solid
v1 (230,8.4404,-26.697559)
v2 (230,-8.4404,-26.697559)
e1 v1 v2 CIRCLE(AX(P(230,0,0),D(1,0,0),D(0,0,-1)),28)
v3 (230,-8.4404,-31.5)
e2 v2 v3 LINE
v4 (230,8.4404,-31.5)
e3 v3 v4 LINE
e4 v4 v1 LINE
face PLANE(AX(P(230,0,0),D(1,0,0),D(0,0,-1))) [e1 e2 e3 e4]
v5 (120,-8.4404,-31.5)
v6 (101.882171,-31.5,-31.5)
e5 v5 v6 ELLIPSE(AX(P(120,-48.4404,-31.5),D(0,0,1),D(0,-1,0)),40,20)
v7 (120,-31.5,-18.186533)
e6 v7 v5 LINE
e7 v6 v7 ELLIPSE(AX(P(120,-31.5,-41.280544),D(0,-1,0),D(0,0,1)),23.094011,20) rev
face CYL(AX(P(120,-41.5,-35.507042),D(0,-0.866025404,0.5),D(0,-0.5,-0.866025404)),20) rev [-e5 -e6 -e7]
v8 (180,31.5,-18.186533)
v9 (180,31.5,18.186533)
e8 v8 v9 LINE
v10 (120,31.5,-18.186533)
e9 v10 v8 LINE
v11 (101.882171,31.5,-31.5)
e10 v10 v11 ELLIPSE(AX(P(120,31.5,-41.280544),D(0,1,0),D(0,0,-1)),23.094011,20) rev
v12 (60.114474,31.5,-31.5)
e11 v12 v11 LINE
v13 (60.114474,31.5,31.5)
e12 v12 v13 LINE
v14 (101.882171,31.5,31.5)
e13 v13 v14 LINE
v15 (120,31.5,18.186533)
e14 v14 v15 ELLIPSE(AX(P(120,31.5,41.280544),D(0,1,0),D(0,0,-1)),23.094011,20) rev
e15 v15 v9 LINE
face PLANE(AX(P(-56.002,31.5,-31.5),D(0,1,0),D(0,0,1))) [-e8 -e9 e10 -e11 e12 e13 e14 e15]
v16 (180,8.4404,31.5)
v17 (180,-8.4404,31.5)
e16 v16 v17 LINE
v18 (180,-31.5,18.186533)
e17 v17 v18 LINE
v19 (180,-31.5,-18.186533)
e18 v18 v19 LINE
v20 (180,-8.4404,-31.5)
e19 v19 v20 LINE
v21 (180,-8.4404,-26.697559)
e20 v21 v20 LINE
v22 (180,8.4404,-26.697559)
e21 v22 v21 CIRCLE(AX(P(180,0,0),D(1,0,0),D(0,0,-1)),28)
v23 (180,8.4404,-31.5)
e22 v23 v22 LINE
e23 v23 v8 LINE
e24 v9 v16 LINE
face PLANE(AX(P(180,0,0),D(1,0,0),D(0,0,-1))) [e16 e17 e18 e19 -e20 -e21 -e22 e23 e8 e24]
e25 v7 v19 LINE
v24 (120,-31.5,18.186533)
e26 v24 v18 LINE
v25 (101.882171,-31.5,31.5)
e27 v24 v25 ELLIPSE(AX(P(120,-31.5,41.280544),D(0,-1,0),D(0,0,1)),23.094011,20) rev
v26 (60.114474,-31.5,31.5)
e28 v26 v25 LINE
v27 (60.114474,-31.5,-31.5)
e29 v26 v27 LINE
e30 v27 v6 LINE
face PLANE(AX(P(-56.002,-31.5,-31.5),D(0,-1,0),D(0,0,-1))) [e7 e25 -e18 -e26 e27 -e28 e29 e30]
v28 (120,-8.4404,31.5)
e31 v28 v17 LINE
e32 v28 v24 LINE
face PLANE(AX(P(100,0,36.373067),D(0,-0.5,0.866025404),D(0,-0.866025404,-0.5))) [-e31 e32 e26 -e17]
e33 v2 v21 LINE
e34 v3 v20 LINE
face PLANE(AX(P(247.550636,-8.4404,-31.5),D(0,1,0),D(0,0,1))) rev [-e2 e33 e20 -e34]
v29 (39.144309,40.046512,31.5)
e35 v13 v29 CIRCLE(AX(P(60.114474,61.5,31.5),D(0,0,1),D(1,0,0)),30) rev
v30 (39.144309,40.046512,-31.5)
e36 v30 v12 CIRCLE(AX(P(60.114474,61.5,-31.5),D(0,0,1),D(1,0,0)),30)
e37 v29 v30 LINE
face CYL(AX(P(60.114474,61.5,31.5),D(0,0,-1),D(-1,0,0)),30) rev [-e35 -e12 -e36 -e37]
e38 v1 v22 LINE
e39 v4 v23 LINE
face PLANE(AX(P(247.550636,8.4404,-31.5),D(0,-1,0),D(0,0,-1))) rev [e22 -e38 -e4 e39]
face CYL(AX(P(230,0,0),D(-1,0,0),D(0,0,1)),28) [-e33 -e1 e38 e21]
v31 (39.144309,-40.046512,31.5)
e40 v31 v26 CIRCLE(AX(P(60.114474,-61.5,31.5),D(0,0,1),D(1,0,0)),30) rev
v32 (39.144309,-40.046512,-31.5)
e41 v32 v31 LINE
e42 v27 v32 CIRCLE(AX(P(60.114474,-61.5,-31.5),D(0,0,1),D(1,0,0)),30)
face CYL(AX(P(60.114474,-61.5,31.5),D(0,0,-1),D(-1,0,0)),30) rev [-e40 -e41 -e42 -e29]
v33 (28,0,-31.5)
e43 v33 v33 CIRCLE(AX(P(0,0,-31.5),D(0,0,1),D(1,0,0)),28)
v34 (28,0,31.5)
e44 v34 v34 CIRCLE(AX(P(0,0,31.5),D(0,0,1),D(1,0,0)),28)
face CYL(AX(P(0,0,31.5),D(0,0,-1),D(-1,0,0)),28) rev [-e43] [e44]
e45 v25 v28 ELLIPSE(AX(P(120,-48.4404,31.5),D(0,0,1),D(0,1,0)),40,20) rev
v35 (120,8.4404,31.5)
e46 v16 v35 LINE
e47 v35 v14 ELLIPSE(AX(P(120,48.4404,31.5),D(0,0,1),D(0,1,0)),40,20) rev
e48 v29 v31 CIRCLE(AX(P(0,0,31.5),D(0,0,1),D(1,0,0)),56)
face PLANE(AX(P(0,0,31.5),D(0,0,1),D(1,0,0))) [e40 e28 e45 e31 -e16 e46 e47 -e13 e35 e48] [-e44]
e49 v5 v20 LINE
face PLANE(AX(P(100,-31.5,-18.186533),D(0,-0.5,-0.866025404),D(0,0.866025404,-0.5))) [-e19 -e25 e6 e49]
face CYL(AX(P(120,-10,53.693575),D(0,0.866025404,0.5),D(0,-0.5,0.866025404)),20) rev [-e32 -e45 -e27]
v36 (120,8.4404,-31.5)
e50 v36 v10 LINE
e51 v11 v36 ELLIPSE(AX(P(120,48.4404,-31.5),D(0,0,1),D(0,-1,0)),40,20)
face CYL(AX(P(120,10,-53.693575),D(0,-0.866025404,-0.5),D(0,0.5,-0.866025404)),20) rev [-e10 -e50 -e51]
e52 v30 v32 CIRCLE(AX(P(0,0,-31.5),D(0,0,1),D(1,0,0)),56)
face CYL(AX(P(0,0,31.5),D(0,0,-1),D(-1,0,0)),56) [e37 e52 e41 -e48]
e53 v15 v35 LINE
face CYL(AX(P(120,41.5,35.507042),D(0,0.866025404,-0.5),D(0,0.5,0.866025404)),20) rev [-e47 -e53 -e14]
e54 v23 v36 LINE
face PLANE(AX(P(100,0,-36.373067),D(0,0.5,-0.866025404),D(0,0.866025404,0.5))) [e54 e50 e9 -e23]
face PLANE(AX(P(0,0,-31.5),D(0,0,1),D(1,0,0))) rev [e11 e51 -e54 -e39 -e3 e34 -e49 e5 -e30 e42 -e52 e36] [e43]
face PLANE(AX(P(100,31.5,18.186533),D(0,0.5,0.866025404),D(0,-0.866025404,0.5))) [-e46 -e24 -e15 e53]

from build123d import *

# Parameters (mm, degrees)
SKETCH1_R                = 56
SKETCH1_R_2              = 28
BOSS_EXTRUDE1_DEPTH      = 31.5
BOSS_EXTRUDE2_REACH      = 246.59
BOSS_EXTRUDE2_END_RADIUS = 56
SKETCH2_W                = 63
SKETCH2_H                = 63
FILLET1_R                = 30
SKETCH3_R                = 28
BOSS_EXTRUDE3_DEPTH      = 50
SKETCH4_R                = 53.440477433
CUT_EXTRUDE1_DEPTH       = 80
FILLET2_R                = 20
BOSS_EXTRUDE4_DEPTH      = 50


with BuildPart() as part:
    # Sketch1 → Boss-Extrude1 (new, symmetric)
    with BuildSketch(Plane.XY):
        Circle(SKETCH1_R)
        Circle(SKETCH1_R_2, mode=Mode.SUBTRACT)
    extrude(amount=BOSS_EXTRUDE1_DEPTH, both=True)

    # Boss-Extrude2: up to this cylinder (the profile starts outside it)
    boss_extrude2_end = Plane(origin=(0, 0, 0), z_dir=(0, 0, -1)) * Cylinder(BOSS_EXTRUDE2_END_RADIUS, 606.18, mode=Mode.PRIVATE)
    # Sketch2 → Boss-Extrude2 (add, up to the surface)
    with BuildSketch(Plane(origin=(180, 0, 0), x_dir=(0, 0, -1), z_dir=(1, 0, 0)), mode=Mode.PRIVATE) as boss_extrude2_sk1:
        Rectangle(SKETCH2_W, SKETCH2_H)
    boss_extrude2_tool1 = extrude(boss_extrude2_sk1.sketch, amount=-BOSS_EXTRUDE2_REACH, mode=Mode.PRIVATE) - boss_extrude2_end
    add(boss_extrude2_tool1.solids().sort_by_distance((180, 0, 0))[0])

    # Fillet1
    fillet1_edges = [part.edges().sort_by_distance(p)[0] for p in [
        (46.300647944, -31.5, 0),
        (46.300647944, 31.5, 0),
    ]]
    fillet(fillet1_edges, radius=FILLET1_R)

    # Sketch3 → Boss-Extrude3 (add)
    with BuildSketch(Plane(origin=(180, 0, 0), x_dir=(0, 0, -1), z_dir=(1, 0, 0))):
        Circle(SKETCH3_R)
    extrude(amount=BOSS_EXTRUDE3_DEPTH)

    # Sketch4 → Cut-Extrude1 (cut)
    with BuildSketch(Plane(origin=(180, 0, 0), x_dir=(0, 0, -1), z_dir=(1, 0, 0))):
        Circle(SKETCH4_R)
        Polygon((18.186533479, -31.5), (36.373066959, 0), (18.186533479, 31.5), (-18.186533479, 31.5), (-36.373066959, 0), (-18.186533479, -31.5), align=None, mode=Mode.SUBTRACT)
    extrude(amount=-CUT_EXTRUDE1_DEPTH, mode=Mode.SUBTRACT)

    # Fillet2
    # the kernel refuses this fillet: 20 mm, written as the material it adds along each edge
    with BuildSketch(Plane(origin=(100, 74.801270189, -6.813466521), x_dir=(1, 0, 0), z_dir=(0, -0.8660254037844388, 0.4999999999999998))) as fillet2_piece_1_section:
        with BuildLine():
            CenterArc((FILLET2_R, FILLET2_R), FILLET2_R, 180, 90)
            Line((0, FILLET2_R), (0, 0))
            Line((0, 0), (FILLET2_R, 0))
        make_face()
    fillet2_piece_1 = extrude(amount=126.626933041, mode=Mode.PRIVATE)
    fillet2_piece_1 = split(fillet2_piece_1, bisect_by=Plane(origin=(105.889651232, 22.332439455, 31.5), z_dir=(0, 0, -1)), keep=Keep.TOP, mode=Mode.PRIVATE)
    fillet2_piece_1 = split(fillet2_piece_1, bisect_by=Plane(origin=(105.889651232, 31.5, 26.207106452), z_dir=(0, -1, 0)), keep=Keep.TOP, mode=Mode.PRIVATE)
    add(fillet2_piece_1)
    with BuildSketch(Plane(origin=(100, 34.860870628, 56.5), x_dir=(0, -0.4999999999999999, 0.8660254037844387), z_dir=(0, -0.8660254037844388, -0.4999999999999999))) as fillet2_piece_2_section:
        with BuildLine():
            CenterArc((FILLET2_R, -FILLET2_R), FILLET2_R, 90, 90)
            Line((0, -FILLET2_R), (0, 0))
            Line((0, 0), (FILLET2_R, 0))
        make_face()
    fillet2_piece_2 = extrude(amount=126.626933041, mode=Mode.PRIVATE)
    fillet2_piece_2 = split(fillet2_piece_2, bisect_by=Plane(origin=(105.889651233, -31.5, 26.207106452), z_dir=(0, 1, 0)), keep=Keep.TOP, mode=Mode.PRIVATE)
    fillet2_piece_2 = split(fillet2_piece_2, bisect_by=Plane(origin=(105.889651233, -22.332439456, 31.5), z_dir=(0, 0, -1)), keep=Keep.TOP, mode=Mode.PRIVATE)
    add(fillet2_piece_2)
    with BuildSketch(Plane(origin=(100, -74.801270189, 6.813466521), x_dir=(0, -0.4999999999999999, -0.8660254037844387), z_dir=(0, 0.8660254037844387, -0.49999999999999994))) as fillet2_piece_3_section:
        with BuildLine():
            CenterArc((FILLET2_R, -FILLET2_R), FILLET2_R, 90, 90)
            Line((0, -FILLET2_R), (0, 0))
            Line((0, 0), (FILLET2_R, 0))
        make_face()
    fillet2_piece_3 = extrude(amount=126.626933041, mode=Mode.PRIVATE)
    fillet2_piece_3 = split(fillet2_piece_3, bisect_by=Plane(origin=(105.889651233, -31.5, -26.207106452), z_dir=(0, 1, 0)), keep=Keep.TOP, mode=Mode.PRIVATE)
    fillet2_piece_3 = split(fillet2_piece_3, bisect_by=Plane(origin=(105.889651233, -22.332439456, -31.5), z_dir=(0, 0, 1)), keep=Keep.TOP, mode=Mode.PRIVATE)
    add(fillet2_piece_3)
    with BuildSketch(Plane(origin=(100, -34.860870628, -56.5), x_dir=(0, 0.49999999999999983, -0.8660254037844387), z_dir=(0, 0.8660254037844388, 0.4999999999999999))) as fillet2_piece_4_section:
        with BuildLine():
            CenterArc((FILLET2_R, -FILLET2_R), FILLET2_R, 90, 90)
            Line((0, -FILLET2_R), (0, 0))
            Line((0, 0), (FILLET2_R, 0))
        make_face()
    fillet2_piece_4 = extrude(amount=126.626933041, mode=Mode.PRIVATE)
    fillet2_piece_4 = split(fillet2_piece_4, bisect_by=Plane(origin=(105.889651233, 22.332439456, -31.5), z_dir=(0, 0, 1)), keep=Keep.TOP, mode=Mode.PRIVATE)
    fillet2_piece_4 = split(fillet2_piece_4, bisect_by=Plane(origin=(105.889651233, 31.5, -26.207106452), z_dir=(0, -1, 0)), keep=Keep.TOP, mode=Mode.PRIVATE)
    add(fillet2_piece_4)

    # Sketch5 → Boss-Extrude4 (add)
    with BuildSketch(Plane(origin=(180, 0, 0), x_dir=(0, 0, -1), z_dir=(1, 0, 0))):
        with BuildLine():
            Line((31.5, 8.440399562), (26.697558975, 8.440399562))
            ThreePointArc((26.697558975, 8.440399562), (28, 0), (26.697558975, -8.440399562))
            Line((26.697558975, -8.440399562), (31.5, -8.440399562))
            Line((31.5, -8.440399562), (31.5, 8.440399562))
        make_face()
    extrude(amount=BOSS_EXTRUDE4_DEPTH)


solid = part.part
